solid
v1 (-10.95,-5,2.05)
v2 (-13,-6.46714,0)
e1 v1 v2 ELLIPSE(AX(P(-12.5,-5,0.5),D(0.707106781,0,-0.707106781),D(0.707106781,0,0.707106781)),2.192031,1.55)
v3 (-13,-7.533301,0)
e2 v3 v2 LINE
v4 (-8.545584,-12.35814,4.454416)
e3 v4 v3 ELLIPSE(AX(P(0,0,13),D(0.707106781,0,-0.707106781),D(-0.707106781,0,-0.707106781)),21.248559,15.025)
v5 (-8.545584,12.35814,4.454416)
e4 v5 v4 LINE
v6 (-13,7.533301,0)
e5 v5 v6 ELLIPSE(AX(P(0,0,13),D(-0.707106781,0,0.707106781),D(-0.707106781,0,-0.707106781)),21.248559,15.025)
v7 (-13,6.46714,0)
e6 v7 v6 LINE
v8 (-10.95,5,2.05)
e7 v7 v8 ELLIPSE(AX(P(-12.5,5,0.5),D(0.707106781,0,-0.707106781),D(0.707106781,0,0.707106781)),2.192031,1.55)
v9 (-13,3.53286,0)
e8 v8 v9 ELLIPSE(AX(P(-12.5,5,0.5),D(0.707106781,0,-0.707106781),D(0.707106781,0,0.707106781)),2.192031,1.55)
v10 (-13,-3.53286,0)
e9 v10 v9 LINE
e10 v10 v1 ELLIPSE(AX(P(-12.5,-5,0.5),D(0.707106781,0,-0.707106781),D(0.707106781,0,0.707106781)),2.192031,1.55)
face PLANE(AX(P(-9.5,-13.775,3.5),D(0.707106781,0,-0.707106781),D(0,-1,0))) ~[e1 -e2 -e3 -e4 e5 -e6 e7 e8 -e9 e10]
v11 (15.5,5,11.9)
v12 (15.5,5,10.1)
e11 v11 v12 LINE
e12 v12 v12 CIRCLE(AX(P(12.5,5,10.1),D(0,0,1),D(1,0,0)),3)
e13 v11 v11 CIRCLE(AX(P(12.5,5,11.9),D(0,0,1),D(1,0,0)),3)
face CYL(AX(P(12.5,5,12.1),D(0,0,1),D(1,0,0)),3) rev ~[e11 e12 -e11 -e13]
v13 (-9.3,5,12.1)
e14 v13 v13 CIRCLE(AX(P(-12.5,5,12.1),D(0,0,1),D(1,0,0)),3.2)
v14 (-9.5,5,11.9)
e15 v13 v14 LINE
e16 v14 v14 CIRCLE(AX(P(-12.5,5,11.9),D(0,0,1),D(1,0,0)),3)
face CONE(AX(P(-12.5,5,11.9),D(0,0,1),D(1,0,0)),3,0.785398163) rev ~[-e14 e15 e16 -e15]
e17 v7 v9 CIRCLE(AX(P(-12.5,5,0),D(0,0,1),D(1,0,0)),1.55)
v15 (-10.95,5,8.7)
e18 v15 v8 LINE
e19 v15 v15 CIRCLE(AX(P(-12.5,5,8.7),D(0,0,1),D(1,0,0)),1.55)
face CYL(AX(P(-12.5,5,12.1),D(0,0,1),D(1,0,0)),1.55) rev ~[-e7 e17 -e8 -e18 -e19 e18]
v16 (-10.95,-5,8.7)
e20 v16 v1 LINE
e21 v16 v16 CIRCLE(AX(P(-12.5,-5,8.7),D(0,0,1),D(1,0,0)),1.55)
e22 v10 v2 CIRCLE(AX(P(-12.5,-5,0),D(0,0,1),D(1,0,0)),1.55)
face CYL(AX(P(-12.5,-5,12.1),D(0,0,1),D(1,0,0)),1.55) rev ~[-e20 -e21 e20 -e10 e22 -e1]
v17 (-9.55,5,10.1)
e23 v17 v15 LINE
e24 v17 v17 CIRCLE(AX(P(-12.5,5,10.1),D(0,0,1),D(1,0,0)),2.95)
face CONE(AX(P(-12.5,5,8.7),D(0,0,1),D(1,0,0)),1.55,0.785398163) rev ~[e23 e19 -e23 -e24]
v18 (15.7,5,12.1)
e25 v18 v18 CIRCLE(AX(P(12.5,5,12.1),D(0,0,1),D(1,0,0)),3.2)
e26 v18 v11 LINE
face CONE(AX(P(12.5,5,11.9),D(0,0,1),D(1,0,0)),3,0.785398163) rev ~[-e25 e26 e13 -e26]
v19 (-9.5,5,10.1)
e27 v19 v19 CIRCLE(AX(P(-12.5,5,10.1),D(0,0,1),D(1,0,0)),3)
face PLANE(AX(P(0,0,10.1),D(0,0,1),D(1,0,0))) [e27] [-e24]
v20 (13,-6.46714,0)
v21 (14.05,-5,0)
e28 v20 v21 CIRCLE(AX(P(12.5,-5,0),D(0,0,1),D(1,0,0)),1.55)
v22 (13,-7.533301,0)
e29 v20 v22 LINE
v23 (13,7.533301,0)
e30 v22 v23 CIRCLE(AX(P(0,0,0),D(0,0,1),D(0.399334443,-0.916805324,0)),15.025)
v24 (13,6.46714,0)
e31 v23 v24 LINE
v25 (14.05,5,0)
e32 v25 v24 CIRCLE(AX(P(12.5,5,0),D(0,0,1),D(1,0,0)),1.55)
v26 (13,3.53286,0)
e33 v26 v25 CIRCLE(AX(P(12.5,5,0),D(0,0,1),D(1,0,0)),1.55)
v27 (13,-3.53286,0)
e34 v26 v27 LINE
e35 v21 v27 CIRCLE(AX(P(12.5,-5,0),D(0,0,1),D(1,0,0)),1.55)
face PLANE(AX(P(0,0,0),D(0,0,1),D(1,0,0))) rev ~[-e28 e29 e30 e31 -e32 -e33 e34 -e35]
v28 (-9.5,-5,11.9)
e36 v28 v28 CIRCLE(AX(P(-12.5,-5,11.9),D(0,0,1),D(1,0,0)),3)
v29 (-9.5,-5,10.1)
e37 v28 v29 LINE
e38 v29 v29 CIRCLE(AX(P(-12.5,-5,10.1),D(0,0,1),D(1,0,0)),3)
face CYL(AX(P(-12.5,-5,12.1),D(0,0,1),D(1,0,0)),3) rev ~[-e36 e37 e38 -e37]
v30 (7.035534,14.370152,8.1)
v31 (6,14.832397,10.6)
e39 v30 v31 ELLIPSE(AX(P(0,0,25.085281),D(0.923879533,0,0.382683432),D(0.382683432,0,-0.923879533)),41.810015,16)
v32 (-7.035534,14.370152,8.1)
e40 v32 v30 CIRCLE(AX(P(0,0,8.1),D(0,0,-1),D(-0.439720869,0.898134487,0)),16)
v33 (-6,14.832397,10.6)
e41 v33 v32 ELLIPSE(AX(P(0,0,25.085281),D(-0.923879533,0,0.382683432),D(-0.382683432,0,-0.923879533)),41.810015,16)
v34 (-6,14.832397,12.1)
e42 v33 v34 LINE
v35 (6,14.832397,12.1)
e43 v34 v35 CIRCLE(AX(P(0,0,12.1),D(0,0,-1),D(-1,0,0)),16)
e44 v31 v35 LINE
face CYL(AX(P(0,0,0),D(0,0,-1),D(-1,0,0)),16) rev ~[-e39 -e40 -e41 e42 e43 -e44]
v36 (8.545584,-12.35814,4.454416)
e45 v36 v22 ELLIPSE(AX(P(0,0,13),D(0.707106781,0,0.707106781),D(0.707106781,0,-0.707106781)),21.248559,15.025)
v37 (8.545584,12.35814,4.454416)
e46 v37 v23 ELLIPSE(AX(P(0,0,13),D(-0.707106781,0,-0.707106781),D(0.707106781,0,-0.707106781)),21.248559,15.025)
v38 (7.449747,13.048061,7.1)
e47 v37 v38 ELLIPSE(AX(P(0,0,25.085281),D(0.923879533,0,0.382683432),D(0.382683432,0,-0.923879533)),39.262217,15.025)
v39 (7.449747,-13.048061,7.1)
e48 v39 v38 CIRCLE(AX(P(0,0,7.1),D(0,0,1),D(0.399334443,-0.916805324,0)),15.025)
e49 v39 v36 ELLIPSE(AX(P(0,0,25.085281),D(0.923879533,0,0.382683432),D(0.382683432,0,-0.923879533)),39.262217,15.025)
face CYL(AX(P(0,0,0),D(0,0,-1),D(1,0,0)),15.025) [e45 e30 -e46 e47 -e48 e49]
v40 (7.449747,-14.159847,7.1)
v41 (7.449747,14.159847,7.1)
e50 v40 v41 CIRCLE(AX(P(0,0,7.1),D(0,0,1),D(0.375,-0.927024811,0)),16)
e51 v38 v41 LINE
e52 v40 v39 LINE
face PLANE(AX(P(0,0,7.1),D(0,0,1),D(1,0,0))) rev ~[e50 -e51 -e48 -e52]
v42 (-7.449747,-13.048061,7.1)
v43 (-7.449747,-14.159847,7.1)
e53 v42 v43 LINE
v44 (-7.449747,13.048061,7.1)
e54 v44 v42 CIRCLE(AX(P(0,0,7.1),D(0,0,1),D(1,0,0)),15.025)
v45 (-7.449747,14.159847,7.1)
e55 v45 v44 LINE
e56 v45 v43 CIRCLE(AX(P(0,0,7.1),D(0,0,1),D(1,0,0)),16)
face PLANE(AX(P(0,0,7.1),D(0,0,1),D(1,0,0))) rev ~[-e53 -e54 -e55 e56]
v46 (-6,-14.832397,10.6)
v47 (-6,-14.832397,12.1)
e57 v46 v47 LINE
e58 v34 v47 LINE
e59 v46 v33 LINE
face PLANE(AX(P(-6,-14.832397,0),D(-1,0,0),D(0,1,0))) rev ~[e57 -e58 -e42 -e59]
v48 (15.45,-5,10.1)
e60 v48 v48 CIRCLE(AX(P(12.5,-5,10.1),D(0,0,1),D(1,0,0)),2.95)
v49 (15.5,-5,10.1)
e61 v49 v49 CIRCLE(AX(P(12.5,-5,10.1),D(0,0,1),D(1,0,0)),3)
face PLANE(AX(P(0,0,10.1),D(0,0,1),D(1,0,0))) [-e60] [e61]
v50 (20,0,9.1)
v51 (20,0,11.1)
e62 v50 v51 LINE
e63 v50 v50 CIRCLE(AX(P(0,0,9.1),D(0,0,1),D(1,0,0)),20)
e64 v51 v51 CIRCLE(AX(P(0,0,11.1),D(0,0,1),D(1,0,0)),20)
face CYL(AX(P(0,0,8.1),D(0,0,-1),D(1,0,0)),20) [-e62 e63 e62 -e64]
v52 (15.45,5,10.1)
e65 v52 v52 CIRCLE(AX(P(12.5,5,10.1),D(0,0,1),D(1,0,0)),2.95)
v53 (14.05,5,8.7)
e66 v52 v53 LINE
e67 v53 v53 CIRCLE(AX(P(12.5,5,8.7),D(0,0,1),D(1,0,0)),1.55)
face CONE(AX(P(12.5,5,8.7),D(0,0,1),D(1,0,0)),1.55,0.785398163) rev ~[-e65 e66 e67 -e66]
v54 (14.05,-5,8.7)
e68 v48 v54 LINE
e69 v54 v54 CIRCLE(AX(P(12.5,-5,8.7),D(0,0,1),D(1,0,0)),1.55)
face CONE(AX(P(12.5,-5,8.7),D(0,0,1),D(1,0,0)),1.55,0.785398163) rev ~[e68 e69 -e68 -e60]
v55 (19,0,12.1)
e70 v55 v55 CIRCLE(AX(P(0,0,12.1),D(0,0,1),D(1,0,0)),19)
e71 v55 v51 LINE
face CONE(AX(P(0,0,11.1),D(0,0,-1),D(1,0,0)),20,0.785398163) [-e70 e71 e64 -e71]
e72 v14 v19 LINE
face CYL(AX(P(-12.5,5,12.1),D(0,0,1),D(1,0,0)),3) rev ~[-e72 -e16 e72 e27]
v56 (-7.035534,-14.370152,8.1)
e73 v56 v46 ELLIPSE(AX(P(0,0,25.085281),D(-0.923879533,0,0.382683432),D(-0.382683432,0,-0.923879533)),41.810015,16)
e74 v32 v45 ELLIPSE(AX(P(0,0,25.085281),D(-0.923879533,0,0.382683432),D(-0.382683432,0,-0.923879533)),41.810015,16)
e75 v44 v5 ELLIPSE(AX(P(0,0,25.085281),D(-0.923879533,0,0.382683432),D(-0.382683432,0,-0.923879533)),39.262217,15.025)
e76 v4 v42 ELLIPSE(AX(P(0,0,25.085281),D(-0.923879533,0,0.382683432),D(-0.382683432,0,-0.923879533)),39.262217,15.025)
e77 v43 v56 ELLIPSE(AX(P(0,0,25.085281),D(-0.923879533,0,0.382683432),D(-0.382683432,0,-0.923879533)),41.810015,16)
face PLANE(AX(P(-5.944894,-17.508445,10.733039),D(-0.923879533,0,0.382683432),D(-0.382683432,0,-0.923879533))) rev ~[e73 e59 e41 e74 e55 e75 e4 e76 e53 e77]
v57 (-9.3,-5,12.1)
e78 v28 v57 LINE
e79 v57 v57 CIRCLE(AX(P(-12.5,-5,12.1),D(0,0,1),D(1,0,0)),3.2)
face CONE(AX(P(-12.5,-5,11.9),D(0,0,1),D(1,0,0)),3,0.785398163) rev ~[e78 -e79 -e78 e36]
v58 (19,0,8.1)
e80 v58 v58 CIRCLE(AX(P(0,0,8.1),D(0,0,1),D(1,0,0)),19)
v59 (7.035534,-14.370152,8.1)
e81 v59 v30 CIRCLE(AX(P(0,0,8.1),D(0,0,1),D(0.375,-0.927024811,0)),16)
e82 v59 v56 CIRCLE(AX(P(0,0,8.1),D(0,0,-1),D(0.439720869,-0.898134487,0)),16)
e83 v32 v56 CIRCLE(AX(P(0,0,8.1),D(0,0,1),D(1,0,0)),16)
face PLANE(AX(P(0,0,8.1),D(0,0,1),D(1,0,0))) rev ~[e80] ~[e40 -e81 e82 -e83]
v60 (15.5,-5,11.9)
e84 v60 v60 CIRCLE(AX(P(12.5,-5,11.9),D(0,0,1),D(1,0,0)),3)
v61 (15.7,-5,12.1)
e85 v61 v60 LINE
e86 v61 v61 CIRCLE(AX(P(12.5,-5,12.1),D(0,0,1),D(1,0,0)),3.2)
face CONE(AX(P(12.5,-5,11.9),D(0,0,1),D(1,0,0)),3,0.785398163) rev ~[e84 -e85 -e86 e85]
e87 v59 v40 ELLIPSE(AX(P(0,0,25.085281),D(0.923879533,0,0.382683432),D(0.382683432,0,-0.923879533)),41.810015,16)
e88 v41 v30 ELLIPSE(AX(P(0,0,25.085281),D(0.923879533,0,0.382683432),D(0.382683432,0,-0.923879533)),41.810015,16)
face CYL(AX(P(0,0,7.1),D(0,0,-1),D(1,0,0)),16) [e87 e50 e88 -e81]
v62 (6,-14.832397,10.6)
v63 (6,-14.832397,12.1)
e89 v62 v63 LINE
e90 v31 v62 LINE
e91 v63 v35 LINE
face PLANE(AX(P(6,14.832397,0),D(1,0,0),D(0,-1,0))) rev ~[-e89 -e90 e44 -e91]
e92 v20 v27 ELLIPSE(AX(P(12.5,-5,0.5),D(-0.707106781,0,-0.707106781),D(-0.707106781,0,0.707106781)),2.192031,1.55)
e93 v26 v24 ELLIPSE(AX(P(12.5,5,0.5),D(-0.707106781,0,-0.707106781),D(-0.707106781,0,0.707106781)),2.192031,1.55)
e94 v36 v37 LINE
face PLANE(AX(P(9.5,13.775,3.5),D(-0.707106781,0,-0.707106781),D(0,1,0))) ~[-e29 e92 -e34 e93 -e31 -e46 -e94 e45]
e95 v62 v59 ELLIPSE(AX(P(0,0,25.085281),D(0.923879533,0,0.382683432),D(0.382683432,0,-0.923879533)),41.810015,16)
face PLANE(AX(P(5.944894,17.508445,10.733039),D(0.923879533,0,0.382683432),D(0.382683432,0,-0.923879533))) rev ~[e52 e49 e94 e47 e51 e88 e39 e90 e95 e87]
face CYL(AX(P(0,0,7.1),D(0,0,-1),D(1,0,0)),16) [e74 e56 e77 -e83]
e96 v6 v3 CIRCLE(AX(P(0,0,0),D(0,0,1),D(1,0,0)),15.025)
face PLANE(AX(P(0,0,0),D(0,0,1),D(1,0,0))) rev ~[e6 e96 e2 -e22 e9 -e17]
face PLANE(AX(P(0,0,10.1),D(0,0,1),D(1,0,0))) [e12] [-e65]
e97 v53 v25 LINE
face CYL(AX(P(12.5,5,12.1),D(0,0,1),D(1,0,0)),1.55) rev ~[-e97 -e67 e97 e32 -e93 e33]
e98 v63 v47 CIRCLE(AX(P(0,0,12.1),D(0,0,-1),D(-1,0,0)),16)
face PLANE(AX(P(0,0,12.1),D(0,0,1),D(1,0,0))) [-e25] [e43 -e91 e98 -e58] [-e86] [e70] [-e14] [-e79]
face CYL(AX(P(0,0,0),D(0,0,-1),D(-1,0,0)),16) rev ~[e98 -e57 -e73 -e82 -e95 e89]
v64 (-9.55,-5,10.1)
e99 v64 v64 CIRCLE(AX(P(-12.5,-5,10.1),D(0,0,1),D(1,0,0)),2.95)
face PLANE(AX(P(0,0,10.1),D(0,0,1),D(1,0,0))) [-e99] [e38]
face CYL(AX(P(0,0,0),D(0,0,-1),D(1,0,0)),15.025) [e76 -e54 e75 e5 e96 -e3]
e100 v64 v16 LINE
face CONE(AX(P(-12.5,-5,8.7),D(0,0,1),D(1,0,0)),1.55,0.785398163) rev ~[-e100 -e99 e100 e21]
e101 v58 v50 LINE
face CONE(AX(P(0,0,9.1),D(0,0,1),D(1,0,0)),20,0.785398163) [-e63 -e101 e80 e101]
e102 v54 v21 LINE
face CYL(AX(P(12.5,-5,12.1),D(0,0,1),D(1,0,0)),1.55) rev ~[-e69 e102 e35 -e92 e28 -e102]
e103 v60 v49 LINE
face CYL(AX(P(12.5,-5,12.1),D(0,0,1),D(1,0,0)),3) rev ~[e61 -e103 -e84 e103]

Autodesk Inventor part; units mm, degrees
ref_plane "YZ Plane" through (0, 0, 0) normal (1, 0, 0) x (0, 1, 0)
ref_plane "XZ Plane" through (0, 0, 0) normal (0, 1, 0) x (-1, 0, 0)
ref_plane "XY Plane" through (0, 0, 0) normal (0, 0, 1) x (1, 0, 0)
sketch "Sketch1" plane through (0, 0, 0) normal (0, 0, 1) x (1, 0, 0)
  circle A0 centre (0, 0) radius 15.025
  dimension "d0" = 30.05
extrude "Extrusion1" add sketch "Sketch1" along normal blind 7.1
sketch "Sketch2" plane through (0, 0, 7.1) normal (0, 0, 1) x (1, 0, 0)
  circle A0 centre (0, 0) radius 16
  dimension "d3" = 32
extrude "Extrusion2" add sketch "Sketch2" along normal blind 1
sketch "Sketch3" plane through (0, 0, 8.1) normal (0, 0, 1) x (1, 0, 0)
  circle A0 centre (0, 0) radius 20
  dimension "d6" = 40
extrude "Extrusion3" add sketch "Sketch3" along normal blind 4
sketch "Sketch4" plane through (0, 0, 0) normal (0, 0, -1) x (-1, 0, 0)
  circle A0 centre (0, 0) radius 16 projected
  line L0 (6, 25.2369) -> (-6, 25.2369)
  line L1 (-6, 25.2369) -> (-6, -24.7248)
  line L2 (-6, -24.7248) -> (6, -24.7248)
  line L3 (6, -24.7248) -> (6, 25.2369)
  point P0 (6, -14.8324)
  point P1 (6, 14.8324)
  point P2 (-6, 14.8324)
  point P3 (-6, -14.8324)
  dimension "d9" = 6
  dimension "d10" = 6
extrude "Extrusion4" cut sketch "Sketch4" against normal through all contours L3 A0 L1
chamfer "Chamfer1" distance 7 angle 45 2 edges at (-6, 0, 0) (6, 0, 0)
chamfer "Chamfer3" distance 1 angle 45 2 edges at (-20, 0, 8.1) (-20, 0, 12.1)
sketch "Sketch6" plane through (0, 0, 12.1) normal (0, 0, 1) x (1, 0, 0)
  circle A0 centre (-12.5, -5) radius 1.55
  arc A1 (-13, 7.5333) -> (-13, -7.5333) centre (0, 0) ccw projected
  line L0 (-13, -7.5333) -> (-13, 7.5333) projected
  line L1 (0, 0) -> (0, -4.0369)
  line L2 (0, 0) -> (-1.7679, 0)
  circle A2 centre (12.5, -5) radius 1.55
  circle A3 centre (-12.5, 5) radius 1.55
  circle A4 centre (12.5, 5) radius 1.55
  dimension "d22" = 5
  dimension "d23" = 12.5
  dimension "d24" = 3.1
extrude "Extrusion5" cut sketch "Sketch6" against normal through all contours A0 L0 | L0 A0 | A3 L0 | L0 A3 | A2 | A4
sketch "Sketch7" plane through (0, 0, 12.1) normal (0, 0, 1) x (1, 0, 0)
  circle A0 centre (-12.5, -5) radius 1.55 projected
  circle A1 centre (-12.5, 5) radius 1.55 projected
  circle A2 centre (12.5, 5) radius 1.55 projected
  circle A3 centre (12.5, -5) radius 1.55 projected
  circle A4 centre (-12.5, -5) radius 3
  circle A5 centre (-12.5, 5) radius 3
  circle A6 centre (12.5, 5) radius 3
  circle A7 centre (12.5, -5) radius 3
  point P0 (0, 0)
  dimension "d27" = 6
  dimension "d28" = 6
  dimension "d29" = 6
  dimension "d30" = 6
extrude "Extrusion6" cut sketch "Sketch7" against normal blind 2
chamfer "Chamfer4" distance 1.4 angle 45 4 edges at (-14.05, -5, 10.1) (-14.05, 5, 10.1) (10.95, 5, 10.1) (10.95, -5, 10.1)
chamfer "Chamfer5" distance 0.2 angle 45 4 edges at (-15.5, -5, 12.1) (-15.5, 5, 12.1) (9.5, -5, 12.1) (9.5, 5, 12.1)
chamfer "Chamfer8" distance 3.6 angle 45 2 edges at (-6, 0, 7) (6, 0, 7)
equation "\"d9\" = d10"
equation "\"d28\" = d27"
equation "\"d29\" = d27"
equation "\"d30\" = d27"
properties part number "arm_head"
